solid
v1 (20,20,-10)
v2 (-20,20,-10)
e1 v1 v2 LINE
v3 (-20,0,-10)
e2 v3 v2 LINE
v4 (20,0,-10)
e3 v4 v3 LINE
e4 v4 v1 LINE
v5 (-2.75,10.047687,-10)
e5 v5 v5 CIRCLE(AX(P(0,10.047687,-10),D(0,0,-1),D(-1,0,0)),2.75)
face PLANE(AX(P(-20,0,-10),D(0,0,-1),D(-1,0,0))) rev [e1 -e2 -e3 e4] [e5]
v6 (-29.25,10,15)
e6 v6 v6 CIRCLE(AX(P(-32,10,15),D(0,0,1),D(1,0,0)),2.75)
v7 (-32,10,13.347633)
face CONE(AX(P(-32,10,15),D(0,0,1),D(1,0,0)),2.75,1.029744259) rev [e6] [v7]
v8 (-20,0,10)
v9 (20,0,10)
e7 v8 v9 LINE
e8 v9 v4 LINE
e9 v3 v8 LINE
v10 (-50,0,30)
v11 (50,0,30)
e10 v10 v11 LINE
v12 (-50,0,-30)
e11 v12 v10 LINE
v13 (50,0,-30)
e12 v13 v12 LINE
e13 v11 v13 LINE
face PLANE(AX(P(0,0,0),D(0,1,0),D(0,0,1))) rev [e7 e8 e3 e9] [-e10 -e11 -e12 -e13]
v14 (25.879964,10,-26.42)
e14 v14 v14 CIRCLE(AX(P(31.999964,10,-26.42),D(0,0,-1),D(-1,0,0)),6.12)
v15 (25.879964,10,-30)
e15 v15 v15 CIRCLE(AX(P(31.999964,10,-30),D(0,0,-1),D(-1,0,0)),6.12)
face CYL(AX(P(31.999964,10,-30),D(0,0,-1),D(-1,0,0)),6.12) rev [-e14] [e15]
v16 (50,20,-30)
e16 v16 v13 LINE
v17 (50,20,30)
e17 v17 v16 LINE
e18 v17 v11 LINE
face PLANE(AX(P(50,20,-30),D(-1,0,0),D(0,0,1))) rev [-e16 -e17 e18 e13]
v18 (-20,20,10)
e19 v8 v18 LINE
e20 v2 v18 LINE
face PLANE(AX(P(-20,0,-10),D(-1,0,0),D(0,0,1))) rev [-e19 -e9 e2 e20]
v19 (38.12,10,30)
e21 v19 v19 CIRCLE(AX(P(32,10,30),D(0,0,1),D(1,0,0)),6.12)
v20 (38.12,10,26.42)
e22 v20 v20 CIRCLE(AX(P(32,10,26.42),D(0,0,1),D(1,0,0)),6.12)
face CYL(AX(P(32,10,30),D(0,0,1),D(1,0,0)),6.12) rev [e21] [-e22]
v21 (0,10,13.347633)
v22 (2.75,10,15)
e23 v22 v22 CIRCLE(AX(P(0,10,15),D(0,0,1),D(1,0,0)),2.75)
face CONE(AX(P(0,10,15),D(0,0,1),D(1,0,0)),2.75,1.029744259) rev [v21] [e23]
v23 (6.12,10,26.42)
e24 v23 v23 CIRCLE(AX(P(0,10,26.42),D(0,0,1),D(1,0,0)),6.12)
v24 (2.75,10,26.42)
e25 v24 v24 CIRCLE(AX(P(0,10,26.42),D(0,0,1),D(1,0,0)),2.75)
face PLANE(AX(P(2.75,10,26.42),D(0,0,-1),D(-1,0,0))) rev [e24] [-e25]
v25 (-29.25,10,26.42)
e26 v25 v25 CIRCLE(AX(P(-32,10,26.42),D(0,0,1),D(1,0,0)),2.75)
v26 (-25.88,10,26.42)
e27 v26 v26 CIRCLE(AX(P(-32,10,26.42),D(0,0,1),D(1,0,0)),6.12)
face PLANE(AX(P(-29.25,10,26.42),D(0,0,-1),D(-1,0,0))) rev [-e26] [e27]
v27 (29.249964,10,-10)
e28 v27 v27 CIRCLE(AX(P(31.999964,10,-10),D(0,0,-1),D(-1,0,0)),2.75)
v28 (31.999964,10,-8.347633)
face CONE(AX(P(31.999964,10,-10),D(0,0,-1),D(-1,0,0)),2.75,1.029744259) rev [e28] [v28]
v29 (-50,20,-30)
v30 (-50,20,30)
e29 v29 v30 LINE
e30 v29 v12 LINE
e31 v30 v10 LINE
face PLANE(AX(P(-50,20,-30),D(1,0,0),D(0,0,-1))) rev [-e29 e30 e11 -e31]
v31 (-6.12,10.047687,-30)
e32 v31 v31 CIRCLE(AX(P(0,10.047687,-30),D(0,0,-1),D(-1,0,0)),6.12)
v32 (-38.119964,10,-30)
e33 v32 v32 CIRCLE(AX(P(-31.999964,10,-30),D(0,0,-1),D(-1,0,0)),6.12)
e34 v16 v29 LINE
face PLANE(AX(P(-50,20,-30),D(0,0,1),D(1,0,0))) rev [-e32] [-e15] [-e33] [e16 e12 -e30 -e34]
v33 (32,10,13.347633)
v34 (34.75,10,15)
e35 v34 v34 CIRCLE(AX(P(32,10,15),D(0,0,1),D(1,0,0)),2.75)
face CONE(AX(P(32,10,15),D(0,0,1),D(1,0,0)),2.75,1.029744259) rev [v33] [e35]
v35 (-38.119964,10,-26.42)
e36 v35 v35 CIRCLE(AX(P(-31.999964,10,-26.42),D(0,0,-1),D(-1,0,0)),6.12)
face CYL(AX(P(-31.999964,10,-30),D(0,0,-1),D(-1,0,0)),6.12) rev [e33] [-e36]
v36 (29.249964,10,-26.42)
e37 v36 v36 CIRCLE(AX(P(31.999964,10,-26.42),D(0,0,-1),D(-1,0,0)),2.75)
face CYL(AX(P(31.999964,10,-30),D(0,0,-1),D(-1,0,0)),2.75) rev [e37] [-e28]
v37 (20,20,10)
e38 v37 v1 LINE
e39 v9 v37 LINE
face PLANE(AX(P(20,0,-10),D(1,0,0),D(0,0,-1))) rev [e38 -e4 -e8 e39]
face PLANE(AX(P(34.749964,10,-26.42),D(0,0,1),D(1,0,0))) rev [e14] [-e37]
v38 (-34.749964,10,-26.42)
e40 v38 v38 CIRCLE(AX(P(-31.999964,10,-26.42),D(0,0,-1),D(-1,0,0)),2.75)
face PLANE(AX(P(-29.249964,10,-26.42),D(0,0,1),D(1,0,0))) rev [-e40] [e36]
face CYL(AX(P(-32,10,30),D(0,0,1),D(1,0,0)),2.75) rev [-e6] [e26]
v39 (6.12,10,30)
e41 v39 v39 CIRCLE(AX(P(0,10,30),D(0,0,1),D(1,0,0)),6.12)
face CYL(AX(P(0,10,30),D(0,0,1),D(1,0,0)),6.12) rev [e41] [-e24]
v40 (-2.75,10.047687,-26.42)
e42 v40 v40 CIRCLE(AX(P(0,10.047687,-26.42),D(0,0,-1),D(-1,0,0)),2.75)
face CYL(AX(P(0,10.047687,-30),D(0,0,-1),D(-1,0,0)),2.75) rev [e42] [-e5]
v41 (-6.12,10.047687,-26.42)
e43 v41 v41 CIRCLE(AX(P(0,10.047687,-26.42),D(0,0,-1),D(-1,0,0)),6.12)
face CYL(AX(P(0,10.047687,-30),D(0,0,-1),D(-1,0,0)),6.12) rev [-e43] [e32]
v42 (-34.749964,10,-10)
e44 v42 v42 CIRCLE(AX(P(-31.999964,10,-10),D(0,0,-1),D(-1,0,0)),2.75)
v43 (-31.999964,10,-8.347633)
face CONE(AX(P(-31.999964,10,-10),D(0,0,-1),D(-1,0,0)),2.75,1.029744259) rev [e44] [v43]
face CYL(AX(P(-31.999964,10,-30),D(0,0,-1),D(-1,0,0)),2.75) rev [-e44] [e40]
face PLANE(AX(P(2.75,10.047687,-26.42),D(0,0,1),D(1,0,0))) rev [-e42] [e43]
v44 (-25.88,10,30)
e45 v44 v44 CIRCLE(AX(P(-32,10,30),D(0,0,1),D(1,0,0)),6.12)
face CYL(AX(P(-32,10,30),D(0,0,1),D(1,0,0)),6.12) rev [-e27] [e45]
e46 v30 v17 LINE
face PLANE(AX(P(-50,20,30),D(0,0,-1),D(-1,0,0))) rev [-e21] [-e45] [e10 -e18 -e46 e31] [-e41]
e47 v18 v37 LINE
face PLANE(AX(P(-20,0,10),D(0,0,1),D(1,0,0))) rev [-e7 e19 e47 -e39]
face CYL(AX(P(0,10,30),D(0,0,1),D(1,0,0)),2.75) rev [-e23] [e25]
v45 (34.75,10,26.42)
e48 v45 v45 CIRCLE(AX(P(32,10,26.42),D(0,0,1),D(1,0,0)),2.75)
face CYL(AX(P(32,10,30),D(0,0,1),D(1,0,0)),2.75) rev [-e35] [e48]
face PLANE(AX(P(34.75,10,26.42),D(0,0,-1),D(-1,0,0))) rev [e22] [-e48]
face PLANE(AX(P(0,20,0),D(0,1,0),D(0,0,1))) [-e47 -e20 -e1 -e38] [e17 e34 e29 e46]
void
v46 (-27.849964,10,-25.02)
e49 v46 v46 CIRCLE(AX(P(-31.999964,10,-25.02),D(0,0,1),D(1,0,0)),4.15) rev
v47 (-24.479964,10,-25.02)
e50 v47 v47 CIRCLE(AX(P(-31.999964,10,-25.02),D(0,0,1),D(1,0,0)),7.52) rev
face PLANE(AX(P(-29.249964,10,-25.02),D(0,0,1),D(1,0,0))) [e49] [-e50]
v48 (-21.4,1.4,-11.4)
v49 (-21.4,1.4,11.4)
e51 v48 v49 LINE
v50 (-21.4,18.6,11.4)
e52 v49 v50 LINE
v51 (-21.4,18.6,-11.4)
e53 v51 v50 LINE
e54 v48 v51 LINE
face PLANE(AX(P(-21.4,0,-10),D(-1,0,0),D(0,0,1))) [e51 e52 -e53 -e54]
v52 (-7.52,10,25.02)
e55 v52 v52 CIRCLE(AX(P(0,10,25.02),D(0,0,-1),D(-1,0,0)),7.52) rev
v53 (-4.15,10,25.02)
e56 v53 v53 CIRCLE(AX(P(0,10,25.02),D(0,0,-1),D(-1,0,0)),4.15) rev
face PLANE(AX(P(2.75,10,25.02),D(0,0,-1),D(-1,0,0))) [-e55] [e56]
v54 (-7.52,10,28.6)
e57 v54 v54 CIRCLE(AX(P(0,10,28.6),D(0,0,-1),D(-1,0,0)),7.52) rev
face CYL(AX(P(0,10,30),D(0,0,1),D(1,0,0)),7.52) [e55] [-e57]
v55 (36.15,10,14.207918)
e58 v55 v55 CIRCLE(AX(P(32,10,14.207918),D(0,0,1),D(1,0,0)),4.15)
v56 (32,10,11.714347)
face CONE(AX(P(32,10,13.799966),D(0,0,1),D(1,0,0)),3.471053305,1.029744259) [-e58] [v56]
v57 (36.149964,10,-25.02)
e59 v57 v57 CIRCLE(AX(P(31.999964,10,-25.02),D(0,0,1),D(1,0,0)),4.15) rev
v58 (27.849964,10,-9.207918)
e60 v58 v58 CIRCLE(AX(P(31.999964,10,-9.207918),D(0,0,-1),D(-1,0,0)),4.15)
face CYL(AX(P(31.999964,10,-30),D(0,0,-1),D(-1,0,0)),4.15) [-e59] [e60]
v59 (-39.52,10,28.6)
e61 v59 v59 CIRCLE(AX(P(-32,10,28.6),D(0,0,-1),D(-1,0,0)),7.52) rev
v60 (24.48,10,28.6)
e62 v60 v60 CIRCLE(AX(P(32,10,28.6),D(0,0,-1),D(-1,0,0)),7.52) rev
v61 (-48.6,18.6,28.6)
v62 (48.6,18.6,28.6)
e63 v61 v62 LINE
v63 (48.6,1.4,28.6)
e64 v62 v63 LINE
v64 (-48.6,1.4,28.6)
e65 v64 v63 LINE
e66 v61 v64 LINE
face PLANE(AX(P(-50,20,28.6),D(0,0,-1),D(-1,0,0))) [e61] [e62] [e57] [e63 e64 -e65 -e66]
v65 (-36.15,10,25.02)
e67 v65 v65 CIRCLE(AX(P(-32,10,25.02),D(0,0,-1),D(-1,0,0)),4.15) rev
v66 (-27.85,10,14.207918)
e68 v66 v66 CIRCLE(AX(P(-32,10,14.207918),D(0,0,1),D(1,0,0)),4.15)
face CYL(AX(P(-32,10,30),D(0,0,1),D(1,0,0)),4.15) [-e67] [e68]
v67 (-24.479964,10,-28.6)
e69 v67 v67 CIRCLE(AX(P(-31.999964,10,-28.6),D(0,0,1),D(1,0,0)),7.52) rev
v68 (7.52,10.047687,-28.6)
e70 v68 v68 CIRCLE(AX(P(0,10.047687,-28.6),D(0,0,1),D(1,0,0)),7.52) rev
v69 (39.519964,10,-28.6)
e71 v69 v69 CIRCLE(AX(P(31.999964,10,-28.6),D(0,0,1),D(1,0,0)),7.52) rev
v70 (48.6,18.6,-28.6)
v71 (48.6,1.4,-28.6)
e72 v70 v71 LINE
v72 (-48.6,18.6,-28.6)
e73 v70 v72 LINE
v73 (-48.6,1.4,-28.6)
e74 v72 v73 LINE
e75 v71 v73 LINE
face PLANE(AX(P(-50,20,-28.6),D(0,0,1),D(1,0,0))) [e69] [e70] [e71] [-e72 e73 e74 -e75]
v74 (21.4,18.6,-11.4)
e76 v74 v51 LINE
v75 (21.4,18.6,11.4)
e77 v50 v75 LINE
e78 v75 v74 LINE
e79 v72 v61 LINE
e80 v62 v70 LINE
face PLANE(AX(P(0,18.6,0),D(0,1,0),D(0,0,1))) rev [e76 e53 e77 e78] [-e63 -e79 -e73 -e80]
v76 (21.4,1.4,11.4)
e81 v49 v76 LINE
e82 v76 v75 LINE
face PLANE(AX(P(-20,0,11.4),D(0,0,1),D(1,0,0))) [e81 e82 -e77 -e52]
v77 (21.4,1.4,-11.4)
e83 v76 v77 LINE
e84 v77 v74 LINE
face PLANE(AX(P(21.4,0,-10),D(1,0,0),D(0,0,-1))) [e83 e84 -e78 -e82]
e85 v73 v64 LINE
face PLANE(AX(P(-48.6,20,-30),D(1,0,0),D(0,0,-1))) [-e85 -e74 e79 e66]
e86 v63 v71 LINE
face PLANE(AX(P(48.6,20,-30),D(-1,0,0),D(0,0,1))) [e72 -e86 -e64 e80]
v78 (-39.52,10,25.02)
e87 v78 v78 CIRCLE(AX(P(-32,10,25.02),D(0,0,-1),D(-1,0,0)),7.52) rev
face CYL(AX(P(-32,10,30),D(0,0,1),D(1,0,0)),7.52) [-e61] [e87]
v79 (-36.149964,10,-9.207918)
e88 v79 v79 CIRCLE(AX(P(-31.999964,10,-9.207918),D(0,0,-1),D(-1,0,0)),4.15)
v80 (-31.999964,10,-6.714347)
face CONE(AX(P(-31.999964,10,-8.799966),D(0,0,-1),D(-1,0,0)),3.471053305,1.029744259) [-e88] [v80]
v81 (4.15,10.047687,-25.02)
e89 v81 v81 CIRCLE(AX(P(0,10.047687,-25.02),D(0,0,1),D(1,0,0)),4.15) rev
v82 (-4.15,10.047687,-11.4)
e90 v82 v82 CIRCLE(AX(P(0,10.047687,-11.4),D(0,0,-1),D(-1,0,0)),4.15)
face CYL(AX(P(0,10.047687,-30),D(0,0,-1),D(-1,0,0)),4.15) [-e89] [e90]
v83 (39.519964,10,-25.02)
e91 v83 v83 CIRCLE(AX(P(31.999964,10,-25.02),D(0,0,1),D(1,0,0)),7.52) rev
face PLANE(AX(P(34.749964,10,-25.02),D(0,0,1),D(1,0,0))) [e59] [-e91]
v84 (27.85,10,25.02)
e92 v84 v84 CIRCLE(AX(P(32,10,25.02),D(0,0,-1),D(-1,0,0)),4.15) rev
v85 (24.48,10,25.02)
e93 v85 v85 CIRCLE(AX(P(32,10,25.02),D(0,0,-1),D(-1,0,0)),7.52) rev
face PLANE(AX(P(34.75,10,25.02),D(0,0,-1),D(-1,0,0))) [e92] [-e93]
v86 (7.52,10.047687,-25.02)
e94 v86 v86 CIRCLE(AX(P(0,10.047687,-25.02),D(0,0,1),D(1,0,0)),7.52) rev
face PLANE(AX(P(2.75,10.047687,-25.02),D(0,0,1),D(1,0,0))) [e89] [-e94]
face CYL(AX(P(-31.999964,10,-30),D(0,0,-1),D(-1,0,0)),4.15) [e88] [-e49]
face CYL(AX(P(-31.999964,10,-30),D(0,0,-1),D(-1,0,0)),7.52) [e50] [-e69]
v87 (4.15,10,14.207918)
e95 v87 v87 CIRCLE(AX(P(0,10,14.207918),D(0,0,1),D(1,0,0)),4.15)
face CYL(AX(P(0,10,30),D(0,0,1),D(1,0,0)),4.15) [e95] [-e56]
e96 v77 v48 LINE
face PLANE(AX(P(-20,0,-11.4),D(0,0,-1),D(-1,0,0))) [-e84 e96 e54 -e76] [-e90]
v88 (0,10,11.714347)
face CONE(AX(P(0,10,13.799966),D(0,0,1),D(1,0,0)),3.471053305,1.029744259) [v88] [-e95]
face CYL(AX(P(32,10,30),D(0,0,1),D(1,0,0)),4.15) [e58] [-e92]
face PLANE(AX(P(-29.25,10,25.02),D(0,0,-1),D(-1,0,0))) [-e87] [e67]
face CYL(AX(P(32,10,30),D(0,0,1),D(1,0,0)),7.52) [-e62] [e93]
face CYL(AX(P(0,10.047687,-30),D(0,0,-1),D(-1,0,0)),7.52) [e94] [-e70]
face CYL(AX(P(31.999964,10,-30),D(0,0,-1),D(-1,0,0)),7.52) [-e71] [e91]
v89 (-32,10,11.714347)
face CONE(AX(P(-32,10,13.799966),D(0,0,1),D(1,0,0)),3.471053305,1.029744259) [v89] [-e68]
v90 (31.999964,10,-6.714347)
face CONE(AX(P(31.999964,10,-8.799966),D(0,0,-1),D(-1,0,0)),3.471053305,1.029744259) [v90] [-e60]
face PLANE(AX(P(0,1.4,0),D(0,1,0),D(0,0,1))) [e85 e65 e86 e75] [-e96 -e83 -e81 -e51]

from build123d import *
from build123d.topology import SkipClean

# Parameters (mm, degrees)
SKETCH1_W                               = 100
SKETCH1_H                               = 60
BOSS_EXTRUDE1_DEPTH                     = 20
SKETCH2_W                               = 40
SKETCH2_H                               = 20
CUT_EXTRUDE1_DEPTH                      = 62.64414003
CBORE_FOR_M5_HEX_HEAD_BOLT1_D           = 5.5
CBORE_FOR_M5_HEX_HEAD_BOLT1_DEPTH       = 15
CBORE_FOR_M5_HEX_HEAD_BOLT1_CBORE_D     = 12.24
CBORE_FOR_M5_HEX_HEAD_BOLT1_CBORE_DEPTH = 3.58
CBORE_FOR_M5_HEX_HEAD_BOLT1_TIP         = 1.652366702
CBORE_FOR_M5_HEX_HEAD_BOLT2_D           = 5.5
CBORE_FOR_M5_HEX_HEAD_BOLT2_DEPTH       = 20
CBORE_FOR_M5_HEX_HEAD_BOLT2_CBORE_D     = 12.24
CBORE_FOR_M5_HEX_HEAD_BOLT2_CBORE_DEPTH = 3.58
CBORE_FOR_M5_HEX_HEAD_BOLT2_TIP         = 1.652366702
SHELL1_START                            = -48.6
SHELL1_2_OUTLINE_W                      = 17.2
SHELL1_2_OUTLINE_H                      = 17.2
SHELL1_2_DEPTH                          = 97.2
SHELL1_3_OUTLINE_W                      = 17.2
SHELL1_3_OUTLINE_H                      = 22.8
SHELL1_3_DEPTH                          = 27.2
SHELL1_START_2                          = 21.4
SHELL1_4_OUTLINE_W                      = 17.2
SHELL1_4_OUTLINE_H                      = 22.8
SHELL1_4_DEPTH                          = 27.2
SHELL1_START_3                          = -28.6
SHELL1_5_OUTLINE_R                      = 7.52
SHELL1_5_OUTLINE_R_2                    = 6.12
SHELL1_5_DEPTH                          = 3.58
SHELL1_START_4                          = -26.42
SHELL1_6_OUTLINE_R                      = 4.15
SHELL1_6_OUTLINE_R_2                    = 2.75
SHELL1_6_DEPTH                          = 15.02
SHELL1_7_OUTLINE_R                      = 6.12
SHELL1_7_OUTLINE_R_2                    = 4.15
SHELL1_7_DEPTH                          = 1.4


with BuildPart() as part:
    # Sketch1 → Boss-Extrude1 (new body)
    with BuildSketch(Plane(origin=(0, 0, 0), x_dir=(1, 0, 0), z_dir=(0, 1, 0))):
        Rectangle(SKETCH1_W, SKETCH1_H)
    extrude(amount=BOSS_EXTRUDE1_DEPTH)

    # Sketch2 → Cut-Extrude1 (cut, through all)
    with BuildSketch(Plane(origin=(0, 20, 0), x_dir=(1, 0, 0), z_dir=(0, 1, 0))):
        Rectangle(SKETCH2_W, SKETCH2_H)
    extrude(amount=-CUT_EXTRUDE1_DEPTH, mode=Mode.SUBTRACT)

    # CBORE for M5 Hex Head Bolt1
    with Locations(Plane.XY.offset(30)):
        with Locations((0, 10), (-32, 10), (32, 10)):
            CounterBoreHole(CBORE_FOR_M5_HEX_HEAD_BOLT1_D / 2, CBORE_FOR_M5_HEX_HEAD_BOLT1_CBORE_D / 2, CBORE_FOR_M5_HEX_HEAD_BOLT1_CBORE_DEPTH, depth=CBORE_FOR_M5_HEX_HEAD_BOLT1_DEPTH)
            with Locations((0, 0, -(CBORE_FOR_M5_HEX_HEAD_BOLT1_DEPTH + CBORE_FOR_M5_HEX_HEAD_BOLT1_TIP / 2))):  # 118° drill point
                Cone(0, CBORE_FOR_M5_HEX_HEAD_BOLT1_D / 2, CBORE_FOR_M5_HEX_HEAD_BOLT1_TIP, mode=Mode.SUBTRACT)

    # CBORE for M5 Hex Head Bolt2
    with Locations(Plane(origin=(0, 0, -30), x_dir=(-1, 0, 0), z_dir=(0, 0, -1))):
        with Locations((0, 10.04768743), (-31.999964467, 10), (31.999964467, 10)):
            CounterBoreHole(CBORE_FOR_M5_HEX_HEAD_BOLT2_D / 2, CBORE_FOR_M5_HEX_HEAD_BOLT2_CBORE_D / 2, CBORE_FOR_M5_HEX_HEAD_BOLT2_CBORE_DEPTH, depth=CBORE_FOR_M5_HEX_HEAD_BOLT2_DEPTH)
            with Locations((0, 0, -(CBORE_FOR_M5_HEX_HEAD_BOLT2_DEPTH + CBORE_FOR_M5_HEX_HEAD_BOLT2_TIP / 2))):  # 118° drill point
                Cone(0, CBORE_FOR_M5_HEX_HEAD_BOLT2_D / 2, CBORE_FOR_M5_HEX_HEAD_BOLT2_TIP, mode=Mode.SUBTRACT)

    # Shell1: read off the stored shape, not the designer's step
    # Shell1 outline → Shell1 (revolve, cut)
    with BuildSketch(Plane(origin=(-32, 10, 0), x_dir=(1, 0, 0), z_dir=(0, -1, 0))):
        Polygon((4.15, 14.207918111), (0, 11.714346542), (7.52, 11.714346542), (7.52, 25.02), (4.15, 25.02), align=None)
    revolve(axis=Axis((-32, 10, 0), (0, 0, 1)), mode=Mode.SUBTRACT)

    # Shell1 2 outline → Shell1 2 (cut)
    with BuildSketch(Plane.YZ.offset(SHELL1_START)):
        with Locations((10, -20)):
            Rectangle(SHELL1_2_OUTLINE_W, SHELL1_2_OUTLINE_H)
        with Locations((10, 20)):
            Rectangle(SHELL1_2_OUTLINE_W, SHELL1_2_OUTLINE_H)
    extrude(amount=SHELL1_2_DEPTH, mode=Mode.SUBTRACT)

    # Shell1 3 outline → Shell1 3 (cut)
    with BuildSketch(Plane.YZ.offset(SHELL1_START)):
        with Locations((10, 0)):
            Rectangle(SHELL1_3_OUTLINE_W, SHELL1_3_OUTLINE_H)
    extrude(amount=SHELL1_3_DEPTH, mode=Mode.SUBTRACT)

    # Shell1 4 outline → Shell1 4 (cut)
    with BuildSketch(Plane.YZ.offset(SHELL1_START_2)):
        with Locations((10, 0)):
            Rectangle(SHELL1_4_OUTLINE_W, SHELL1_4_OUTLINE_H)
    extrude(amount=SHELL1_4_DEPTH, mode=Mode.SUBTRACT)

    # Shell1 5 outline → Shell1 5 (add)
    # profile 1 of 3: a face of its own
    with SkipClean():  # the faces are left unmerged after this step: merging them gives an invalid solid
        with BuildSketch(Plane.XY.offset(SHELL1_START_3)):
            with Locations((0, 10.04768743)):
                Circle(SHELL1_5_OUTLINE_R)
            with Locations((0, 10.04768743)):
                Circle(SHELL1_5_OUTLINE_R_2, mode=Mode.SUBTRACT)
        # profile 2 of 3: a face of its own
        with BuildSketch(Plane.XY.offset(SHELL1_START_3)):
            with Locations((-31.999964467, 10)):
                Circle(SHELL1_5_OUTLINE_R)
            with Locations((-31.999964467, 10)):
                Circle(SHELL1_5_OUTLINE_R_2, mode=Mode.SUBTRACT)
        # profile 3 of 3: a face of its own
        with BuildSketch(Plane.XY.offset(SHELL1_START_3)):
            with Locations((31.999964467, 10)):
                Circle(SHELL1_5_OUTLINE_R)
            with Locations((31.999964467, 10)):
                Circle(SHELL1_5_OUTLINE_R_2, mode=Mode.SUBTRACT)
        extrude(amount=SHELL1_5_DEPTH)
    add(part.part.scale(1), mode=Mode.REPLACE)  # the faces are merged on a copy

    # Shell1 6 outline → Shell1 6 (add)
    with BuildSketch(Plane.XY.offset(SHELL1_START_4)):
        with Locations((0, 10.04768743)):
            Circle(SHELL1_6_OUTLINE_R)
        with Locations((0, 10.04768743)):
            Circle(SHELL1_6_OUTLINE_R_2, mode=Mode.SUBTRACT)
    extrude(amount=SHELL1_6_DEPTH)

    # Shell1 7 outline → Shell1 7 (add)
    with SkipClean():  # the faces are left unmerged after this step: merging them gives an invalid solid
        with BuildSketch(Plane.XY.offset(SHELL1_START_4)):
            with Locations((0, 10.04768743)):
                Circle(SHELL1_7_OUTLINE_R)
            with Locations((0, 10.04768743)):
                Circle(SHELL1_7_OUTLINE_R_2, mode=Mode.SUBTRACT)
        extrude(amount=SHELL1_7_DEPTH)

    # Shell1 8 outline → Shell1 8 (revolve)
    with SkipClean():  # the faces are left unmerged after this step: merging them gives an invalid solid
        with BuildSketch(Plane(origin=(32, 10, 0), x_dir=(1, 0, 0), z_dir=(0, -1, 0))):
            Polygon((0, 11.714346542), (4.15, 14.207918111), (4.15, 25.02), (7.52, 25.02), (7.52, 28.6), (6.12, 28.6), (6.12, 26.42), (2.75, 26.42), (2.75, 15), (0, 13.347633298), align=None)
        revolve(axis=Axis((32, 10, 0), (0, 0, 1)))

    # Shell1 9 outline → Shell1 9 (revolve)
    with SkipClean():  # the faces are left unmerged after this step: merging them gives an invalid solid
        with BuildSketch(Plane(origin=(-32, 10, 0), x_dir=(1, 0, 0), z_dir=(0, -1, 0))):
            Polygon((2.75, 26.42), (2.75, 15), (0, 13.347633298), (0, 11.714346542), (4.15, 14.207918111), (4.15, 25.02), (7.52, 25.02), (7.52, 28.6), (6.12, 28.6), (6.12, 26.42), align=None)
        revolve(axis=Axis((-32, 10, 0), (0, 0, 1)))

    # Shell1 10 outline → Shell1 10 (revolve)
    with SkipClean():  # the faces are left unmerged after this step: merging them gives an invalid solid
        with BuildSketch(Plane.XZ.offset(-10)):
            Polygon((2.75, 26.42), (2.75, 15), (0, 13.347633298), (0, 11.714346542), (4.15, 14.207918111), (4.15, 25.02), (7.52, 25.02), (7.52, 28.6), (6.12, 28.6), (6.12, 26.42), align=None)
        revolve(axis=Axis((0, 10, 0), (0, 0, 1)))

    # Shell1 11 outline → Shell1 11 (revolve)
    with BuildSketch(Plane(origin=(-31.999964467, 10, 0), x_dir=(1, 0, 0), z_dir=(0, -1, 0))):
        Polygon((0, -6.714346542), (0, -8.347633298), (2.75, -10), (2.75, -26.42), (6.12, -26.42), (6.12, -28.6), (7.52, -28.6), (7.52, -25.02), (4.15, -25.02), (4.15, -9.207918111), align=None)
    revolve(axis=Axis((-31.999964467, 10, 0), (0, 0, 1)))

    # Shell1 12 outline → Shell1 12 (revolve)
    with BuildSketch(Plane(origin=(31.999964467, 10, 0), x_dir=(1, 0, 0), z_dir=(0, -1, 0))):
        Polygon((2.75, -10), (2.75, -26.42), (6.12, -26.42), (6.12, -28.6), (7.52, -28.6), (7.52, -25.02), (4.15, -25.02), (4.15, -9.207918111), (0, -6.714346542), (0, -8.347633298), align=None)
    revolve(axis=Axis((31.999964467, 10, 0), (0, 0, 1)))


solid = part.part
